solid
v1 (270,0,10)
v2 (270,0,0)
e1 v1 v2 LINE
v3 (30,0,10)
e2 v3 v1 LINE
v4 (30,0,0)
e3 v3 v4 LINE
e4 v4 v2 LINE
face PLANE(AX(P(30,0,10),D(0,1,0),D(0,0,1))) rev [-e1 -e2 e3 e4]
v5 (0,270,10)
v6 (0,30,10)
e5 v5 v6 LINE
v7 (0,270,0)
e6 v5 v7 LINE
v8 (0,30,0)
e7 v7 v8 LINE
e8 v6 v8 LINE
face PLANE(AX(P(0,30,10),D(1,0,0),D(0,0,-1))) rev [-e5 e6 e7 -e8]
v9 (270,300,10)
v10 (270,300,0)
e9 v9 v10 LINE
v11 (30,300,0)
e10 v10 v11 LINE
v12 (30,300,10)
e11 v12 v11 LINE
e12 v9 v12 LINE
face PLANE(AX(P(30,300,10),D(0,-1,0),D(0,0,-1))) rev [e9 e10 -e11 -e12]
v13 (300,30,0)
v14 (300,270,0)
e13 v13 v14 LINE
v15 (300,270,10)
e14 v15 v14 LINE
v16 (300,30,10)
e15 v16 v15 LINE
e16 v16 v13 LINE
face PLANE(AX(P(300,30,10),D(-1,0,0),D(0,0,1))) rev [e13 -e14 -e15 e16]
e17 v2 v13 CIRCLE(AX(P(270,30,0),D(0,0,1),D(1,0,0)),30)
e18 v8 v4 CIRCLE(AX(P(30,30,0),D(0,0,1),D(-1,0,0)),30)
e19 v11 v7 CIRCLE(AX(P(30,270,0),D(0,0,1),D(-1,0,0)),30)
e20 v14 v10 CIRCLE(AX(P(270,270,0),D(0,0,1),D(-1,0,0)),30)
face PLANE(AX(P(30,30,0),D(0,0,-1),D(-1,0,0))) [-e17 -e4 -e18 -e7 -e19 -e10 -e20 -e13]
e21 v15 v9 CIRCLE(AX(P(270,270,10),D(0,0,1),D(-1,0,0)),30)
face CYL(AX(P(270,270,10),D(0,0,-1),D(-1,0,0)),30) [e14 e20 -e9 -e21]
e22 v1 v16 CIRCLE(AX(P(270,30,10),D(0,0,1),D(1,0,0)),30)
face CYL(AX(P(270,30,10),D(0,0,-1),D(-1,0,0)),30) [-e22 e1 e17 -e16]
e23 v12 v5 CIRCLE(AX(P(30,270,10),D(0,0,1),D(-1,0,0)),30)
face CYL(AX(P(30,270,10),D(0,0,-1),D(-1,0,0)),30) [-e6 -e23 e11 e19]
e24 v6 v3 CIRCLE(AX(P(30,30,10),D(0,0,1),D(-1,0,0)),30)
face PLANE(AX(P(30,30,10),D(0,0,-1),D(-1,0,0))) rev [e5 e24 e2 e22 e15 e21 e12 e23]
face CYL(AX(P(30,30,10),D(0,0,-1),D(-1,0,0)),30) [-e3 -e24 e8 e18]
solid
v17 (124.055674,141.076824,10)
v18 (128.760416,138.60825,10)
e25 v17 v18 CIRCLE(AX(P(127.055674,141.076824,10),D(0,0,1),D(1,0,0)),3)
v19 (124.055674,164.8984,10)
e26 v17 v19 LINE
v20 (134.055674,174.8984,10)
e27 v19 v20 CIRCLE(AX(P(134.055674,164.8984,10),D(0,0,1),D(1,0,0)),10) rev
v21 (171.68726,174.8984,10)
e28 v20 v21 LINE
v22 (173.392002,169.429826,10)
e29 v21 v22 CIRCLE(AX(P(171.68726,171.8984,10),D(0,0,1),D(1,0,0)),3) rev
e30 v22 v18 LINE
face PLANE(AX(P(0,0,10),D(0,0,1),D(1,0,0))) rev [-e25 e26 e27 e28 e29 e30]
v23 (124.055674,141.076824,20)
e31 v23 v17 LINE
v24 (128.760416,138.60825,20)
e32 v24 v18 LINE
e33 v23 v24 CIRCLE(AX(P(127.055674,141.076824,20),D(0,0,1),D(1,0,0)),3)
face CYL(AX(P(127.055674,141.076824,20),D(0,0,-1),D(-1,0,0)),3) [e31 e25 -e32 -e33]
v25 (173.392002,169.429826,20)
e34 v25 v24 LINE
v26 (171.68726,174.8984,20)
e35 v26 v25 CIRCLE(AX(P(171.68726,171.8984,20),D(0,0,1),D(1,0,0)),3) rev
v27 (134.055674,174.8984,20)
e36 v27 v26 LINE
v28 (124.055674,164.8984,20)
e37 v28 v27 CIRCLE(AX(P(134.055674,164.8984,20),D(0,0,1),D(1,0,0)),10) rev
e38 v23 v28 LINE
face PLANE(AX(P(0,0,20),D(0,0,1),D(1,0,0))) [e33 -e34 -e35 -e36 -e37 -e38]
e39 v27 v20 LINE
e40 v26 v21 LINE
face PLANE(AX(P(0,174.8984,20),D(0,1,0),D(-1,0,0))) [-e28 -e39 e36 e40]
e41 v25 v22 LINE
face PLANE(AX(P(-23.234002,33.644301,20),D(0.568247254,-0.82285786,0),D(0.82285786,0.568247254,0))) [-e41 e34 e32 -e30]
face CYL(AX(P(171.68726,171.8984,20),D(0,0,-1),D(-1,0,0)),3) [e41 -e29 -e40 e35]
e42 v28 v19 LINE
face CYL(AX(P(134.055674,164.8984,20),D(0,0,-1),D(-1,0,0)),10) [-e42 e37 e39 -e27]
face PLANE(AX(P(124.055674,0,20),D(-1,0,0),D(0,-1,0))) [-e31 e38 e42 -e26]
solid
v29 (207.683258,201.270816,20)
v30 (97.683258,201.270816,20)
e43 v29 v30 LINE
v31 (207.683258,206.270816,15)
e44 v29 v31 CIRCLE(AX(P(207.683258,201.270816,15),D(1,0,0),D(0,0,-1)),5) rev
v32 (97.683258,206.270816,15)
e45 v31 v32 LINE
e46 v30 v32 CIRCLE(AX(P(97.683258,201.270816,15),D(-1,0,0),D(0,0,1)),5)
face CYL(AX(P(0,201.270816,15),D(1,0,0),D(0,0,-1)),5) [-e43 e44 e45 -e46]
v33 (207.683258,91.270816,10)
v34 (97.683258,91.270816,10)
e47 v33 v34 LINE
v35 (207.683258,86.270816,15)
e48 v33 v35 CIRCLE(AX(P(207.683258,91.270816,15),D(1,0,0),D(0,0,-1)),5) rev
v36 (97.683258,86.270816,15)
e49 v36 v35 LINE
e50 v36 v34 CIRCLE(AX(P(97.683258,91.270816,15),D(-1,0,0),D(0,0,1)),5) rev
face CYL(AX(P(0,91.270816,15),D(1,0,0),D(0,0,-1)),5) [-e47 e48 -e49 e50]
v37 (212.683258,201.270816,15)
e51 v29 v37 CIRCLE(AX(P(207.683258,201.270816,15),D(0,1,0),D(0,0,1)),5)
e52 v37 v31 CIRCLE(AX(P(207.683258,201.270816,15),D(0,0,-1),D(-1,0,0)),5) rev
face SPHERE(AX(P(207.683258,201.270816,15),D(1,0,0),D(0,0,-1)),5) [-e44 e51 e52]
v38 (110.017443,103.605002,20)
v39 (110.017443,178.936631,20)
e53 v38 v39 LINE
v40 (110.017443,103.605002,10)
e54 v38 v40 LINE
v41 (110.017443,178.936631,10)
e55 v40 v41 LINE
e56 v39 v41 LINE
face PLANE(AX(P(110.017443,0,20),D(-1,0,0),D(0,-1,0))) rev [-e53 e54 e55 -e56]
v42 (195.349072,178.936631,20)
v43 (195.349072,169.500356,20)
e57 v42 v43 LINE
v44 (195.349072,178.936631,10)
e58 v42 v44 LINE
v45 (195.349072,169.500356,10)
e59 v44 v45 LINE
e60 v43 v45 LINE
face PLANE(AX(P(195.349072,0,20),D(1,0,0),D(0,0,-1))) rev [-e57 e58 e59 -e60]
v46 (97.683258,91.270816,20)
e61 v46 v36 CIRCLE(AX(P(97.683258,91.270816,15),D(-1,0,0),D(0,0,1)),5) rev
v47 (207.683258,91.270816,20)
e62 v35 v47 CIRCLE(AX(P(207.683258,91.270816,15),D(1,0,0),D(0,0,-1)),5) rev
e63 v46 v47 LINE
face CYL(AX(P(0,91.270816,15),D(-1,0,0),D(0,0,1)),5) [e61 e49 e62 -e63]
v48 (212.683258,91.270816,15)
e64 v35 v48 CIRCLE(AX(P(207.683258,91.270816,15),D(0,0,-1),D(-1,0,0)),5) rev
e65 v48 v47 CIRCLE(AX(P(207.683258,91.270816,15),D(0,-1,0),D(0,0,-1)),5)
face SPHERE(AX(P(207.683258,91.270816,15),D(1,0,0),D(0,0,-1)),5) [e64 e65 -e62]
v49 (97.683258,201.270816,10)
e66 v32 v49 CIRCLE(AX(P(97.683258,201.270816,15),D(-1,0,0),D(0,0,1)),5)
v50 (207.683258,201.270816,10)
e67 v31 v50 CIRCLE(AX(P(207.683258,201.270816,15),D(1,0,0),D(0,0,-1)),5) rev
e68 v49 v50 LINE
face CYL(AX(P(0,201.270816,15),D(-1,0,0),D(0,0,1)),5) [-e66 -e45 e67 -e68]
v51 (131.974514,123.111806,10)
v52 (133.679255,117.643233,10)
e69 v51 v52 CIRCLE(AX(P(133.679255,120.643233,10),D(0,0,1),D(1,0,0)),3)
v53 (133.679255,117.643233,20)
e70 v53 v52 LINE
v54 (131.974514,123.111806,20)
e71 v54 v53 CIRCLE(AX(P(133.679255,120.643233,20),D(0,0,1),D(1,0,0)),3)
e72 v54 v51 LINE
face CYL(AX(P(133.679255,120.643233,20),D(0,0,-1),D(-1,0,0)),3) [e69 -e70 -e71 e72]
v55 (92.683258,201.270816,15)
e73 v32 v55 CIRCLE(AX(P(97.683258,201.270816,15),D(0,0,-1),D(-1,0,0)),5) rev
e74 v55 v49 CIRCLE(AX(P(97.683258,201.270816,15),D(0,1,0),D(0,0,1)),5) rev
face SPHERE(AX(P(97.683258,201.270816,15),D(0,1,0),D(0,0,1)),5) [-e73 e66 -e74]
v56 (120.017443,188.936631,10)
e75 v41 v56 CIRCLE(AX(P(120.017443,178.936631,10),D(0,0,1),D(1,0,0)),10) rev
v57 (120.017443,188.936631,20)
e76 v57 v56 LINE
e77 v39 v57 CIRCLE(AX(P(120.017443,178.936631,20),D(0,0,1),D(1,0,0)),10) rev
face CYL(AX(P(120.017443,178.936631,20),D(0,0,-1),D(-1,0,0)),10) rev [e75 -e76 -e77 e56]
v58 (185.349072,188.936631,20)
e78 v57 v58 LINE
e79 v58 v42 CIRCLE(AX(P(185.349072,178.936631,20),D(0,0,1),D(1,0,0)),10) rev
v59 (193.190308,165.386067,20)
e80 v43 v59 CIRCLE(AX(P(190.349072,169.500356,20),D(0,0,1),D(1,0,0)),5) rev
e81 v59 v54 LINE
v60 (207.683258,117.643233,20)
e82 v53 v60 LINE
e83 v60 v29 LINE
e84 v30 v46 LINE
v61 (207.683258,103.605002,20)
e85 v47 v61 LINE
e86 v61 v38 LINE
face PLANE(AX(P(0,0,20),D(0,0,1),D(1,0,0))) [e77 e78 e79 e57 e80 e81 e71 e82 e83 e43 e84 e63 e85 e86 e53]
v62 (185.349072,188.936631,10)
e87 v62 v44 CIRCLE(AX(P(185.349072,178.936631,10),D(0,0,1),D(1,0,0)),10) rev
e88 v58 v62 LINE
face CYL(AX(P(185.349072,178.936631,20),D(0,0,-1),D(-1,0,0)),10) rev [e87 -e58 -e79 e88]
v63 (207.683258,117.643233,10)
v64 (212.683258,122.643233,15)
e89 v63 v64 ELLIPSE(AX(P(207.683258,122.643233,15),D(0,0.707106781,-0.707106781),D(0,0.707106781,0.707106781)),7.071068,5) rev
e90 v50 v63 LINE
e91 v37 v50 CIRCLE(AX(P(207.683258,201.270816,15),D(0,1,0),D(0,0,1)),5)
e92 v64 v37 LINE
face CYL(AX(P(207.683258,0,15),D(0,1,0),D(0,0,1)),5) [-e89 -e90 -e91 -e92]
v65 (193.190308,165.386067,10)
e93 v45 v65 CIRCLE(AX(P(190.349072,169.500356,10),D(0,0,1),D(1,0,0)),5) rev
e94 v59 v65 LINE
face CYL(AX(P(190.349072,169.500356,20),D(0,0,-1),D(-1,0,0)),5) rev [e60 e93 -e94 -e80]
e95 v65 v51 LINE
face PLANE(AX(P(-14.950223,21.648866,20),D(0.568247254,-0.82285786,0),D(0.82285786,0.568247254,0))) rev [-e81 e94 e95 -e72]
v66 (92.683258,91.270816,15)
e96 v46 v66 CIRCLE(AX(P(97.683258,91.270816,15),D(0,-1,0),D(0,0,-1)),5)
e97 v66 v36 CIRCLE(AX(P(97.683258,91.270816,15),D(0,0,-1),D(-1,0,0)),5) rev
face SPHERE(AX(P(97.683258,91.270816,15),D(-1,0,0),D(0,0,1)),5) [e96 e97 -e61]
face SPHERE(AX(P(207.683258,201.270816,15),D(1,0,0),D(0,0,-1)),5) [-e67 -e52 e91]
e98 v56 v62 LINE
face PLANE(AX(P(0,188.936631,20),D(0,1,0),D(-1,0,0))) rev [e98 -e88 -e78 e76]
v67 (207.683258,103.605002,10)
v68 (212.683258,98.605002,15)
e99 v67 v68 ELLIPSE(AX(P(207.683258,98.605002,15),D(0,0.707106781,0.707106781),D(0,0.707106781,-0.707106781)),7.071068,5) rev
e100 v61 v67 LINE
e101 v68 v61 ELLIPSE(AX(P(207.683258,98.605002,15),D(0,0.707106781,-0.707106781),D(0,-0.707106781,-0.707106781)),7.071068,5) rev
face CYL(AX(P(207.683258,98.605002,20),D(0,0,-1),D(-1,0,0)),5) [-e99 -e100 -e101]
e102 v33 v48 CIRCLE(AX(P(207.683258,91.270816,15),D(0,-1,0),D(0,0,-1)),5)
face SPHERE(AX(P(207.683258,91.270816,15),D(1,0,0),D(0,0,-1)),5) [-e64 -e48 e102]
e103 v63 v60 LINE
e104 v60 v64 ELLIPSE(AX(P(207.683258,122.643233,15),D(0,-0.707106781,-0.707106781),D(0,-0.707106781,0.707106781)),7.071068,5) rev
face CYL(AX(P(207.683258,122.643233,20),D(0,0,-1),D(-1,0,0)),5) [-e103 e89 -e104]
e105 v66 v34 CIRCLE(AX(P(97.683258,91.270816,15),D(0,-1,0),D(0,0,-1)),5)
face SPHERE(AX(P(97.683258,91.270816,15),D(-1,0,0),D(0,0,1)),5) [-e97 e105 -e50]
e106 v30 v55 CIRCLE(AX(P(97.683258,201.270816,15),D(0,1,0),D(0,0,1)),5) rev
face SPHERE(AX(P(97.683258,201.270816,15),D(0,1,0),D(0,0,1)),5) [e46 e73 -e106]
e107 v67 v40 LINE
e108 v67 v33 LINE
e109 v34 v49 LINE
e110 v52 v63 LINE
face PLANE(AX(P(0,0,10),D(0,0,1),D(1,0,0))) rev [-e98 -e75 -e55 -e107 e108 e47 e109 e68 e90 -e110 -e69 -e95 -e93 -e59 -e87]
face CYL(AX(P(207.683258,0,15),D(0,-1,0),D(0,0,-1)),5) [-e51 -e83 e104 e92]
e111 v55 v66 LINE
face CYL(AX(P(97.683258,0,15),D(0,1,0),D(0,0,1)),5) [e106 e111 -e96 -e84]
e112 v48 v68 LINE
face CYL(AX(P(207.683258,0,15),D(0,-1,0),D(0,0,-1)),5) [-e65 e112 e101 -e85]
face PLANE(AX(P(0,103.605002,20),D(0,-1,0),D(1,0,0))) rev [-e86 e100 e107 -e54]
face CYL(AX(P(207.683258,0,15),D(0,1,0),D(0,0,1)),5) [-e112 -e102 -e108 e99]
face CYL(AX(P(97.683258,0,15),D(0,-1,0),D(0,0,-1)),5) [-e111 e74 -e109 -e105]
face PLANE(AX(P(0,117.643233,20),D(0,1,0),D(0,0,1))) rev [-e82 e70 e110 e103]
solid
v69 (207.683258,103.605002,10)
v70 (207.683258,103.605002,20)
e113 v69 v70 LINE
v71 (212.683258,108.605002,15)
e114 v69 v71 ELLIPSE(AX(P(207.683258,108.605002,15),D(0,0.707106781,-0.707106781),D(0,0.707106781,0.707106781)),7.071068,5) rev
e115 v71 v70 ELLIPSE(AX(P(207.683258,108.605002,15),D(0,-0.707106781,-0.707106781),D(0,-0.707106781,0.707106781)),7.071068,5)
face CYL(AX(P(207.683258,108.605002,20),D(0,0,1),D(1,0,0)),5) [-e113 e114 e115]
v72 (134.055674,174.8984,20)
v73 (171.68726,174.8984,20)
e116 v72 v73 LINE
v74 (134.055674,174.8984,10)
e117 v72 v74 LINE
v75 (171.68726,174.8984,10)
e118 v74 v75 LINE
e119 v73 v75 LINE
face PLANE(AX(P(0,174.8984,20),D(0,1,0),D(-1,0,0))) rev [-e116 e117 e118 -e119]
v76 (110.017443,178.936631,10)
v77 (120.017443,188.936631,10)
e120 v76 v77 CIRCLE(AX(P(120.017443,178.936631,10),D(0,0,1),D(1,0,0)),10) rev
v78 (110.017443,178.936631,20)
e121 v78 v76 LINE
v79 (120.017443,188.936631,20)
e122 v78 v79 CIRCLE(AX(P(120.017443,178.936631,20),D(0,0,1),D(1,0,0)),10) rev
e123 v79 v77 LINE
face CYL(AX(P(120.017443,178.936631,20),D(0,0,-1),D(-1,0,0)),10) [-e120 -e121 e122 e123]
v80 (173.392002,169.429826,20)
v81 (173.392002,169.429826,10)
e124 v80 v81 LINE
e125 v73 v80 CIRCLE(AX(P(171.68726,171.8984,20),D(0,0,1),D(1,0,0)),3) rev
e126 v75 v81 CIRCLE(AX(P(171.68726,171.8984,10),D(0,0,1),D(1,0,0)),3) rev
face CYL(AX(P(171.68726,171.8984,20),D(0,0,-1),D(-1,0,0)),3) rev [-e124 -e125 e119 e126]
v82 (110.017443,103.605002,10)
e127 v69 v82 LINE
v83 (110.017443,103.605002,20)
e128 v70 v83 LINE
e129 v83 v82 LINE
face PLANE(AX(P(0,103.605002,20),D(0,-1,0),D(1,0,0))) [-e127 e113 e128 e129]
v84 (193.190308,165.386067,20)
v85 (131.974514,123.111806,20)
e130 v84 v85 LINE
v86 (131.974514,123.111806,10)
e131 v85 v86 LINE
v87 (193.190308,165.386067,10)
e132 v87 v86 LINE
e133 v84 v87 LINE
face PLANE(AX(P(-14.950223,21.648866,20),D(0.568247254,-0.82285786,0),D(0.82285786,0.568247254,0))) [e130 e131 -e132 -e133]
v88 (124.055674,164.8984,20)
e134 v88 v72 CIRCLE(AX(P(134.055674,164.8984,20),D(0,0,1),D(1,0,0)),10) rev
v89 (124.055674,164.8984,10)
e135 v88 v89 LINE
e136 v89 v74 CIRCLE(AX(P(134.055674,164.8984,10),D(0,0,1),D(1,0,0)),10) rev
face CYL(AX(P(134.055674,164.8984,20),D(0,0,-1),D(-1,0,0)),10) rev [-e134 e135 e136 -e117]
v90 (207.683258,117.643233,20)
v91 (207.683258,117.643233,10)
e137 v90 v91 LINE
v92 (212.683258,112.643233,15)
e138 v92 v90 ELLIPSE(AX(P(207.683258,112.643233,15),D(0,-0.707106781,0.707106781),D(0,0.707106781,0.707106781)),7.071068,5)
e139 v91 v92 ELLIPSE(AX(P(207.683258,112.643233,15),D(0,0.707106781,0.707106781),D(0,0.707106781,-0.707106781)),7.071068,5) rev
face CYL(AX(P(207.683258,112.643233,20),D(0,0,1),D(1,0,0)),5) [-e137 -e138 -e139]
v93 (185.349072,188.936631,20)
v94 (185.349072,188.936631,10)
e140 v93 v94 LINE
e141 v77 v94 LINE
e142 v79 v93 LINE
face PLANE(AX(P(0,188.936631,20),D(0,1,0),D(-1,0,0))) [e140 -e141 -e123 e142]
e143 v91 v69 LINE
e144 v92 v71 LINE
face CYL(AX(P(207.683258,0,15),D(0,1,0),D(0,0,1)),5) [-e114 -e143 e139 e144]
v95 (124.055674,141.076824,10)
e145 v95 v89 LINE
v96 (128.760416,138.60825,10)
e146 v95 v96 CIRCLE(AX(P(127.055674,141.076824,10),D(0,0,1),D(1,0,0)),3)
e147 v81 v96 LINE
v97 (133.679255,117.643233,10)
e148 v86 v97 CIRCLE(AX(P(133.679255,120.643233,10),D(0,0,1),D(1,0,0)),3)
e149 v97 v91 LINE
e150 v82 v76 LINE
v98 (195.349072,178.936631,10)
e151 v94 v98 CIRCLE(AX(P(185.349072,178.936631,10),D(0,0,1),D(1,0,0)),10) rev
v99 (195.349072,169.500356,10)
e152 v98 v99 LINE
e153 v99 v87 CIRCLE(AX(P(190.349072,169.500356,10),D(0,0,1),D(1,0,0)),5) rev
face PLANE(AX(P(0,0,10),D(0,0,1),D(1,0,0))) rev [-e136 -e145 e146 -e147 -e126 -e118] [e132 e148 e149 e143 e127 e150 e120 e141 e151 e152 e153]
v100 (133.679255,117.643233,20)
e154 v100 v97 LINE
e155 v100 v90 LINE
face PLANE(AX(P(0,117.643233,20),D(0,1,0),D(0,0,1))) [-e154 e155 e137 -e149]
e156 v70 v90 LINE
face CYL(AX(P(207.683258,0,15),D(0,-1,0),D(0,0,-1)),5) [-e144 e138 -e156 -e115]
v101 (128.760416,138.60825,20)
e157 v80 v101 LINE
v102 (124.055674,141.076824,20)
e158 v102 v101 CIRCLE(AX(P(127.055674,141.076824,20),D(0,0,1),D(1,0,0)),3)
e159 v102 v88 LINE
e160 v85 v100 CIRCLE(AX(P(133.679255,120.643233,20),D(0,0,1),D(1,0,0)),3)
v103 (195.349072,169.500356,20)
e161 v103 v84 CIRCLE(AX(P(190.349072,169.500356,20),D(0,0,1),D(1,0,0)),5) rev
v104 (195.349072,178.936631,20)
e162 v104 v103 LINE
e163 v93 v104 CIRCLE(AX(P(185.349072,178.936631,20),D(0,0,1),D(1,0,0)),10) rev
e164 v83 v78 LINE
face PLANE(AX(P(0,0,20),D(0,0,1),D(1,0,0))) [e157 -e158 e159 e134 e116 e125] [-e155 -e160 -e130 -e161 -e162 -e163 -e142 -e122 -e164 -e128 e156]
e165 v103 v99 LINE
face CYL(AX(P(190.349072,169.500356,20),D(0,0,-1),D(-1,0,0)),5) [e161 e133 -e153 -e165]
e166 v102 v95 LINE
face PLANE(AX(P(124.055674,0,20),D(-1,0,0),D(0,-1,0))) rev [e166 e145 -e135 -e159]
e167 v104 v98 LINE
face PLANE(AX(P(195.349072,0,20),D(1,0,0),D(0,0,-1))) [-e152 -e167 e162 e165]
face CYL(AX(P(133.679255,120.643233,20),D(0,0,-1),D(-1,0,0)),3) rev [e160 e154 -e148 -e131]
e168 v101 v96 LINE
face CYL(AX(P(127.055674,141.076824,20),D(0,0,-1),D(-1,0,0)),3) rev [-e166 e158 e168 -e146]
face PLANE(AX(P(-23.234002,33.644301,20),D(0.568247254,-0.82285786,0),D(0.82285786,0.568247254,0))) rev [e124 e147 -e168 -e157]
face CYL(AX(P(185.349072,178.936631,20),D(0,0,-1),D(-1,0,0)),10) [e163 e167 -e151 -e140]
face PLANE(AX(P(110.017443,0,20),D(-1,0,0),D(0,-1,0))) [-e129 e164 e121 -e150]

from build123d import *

# Parameters (mm, degrees)
BOSS_EXTRUDE1_DEPTH   = 10
BOSS_EXTRUDE2_DEPTH   = 10
BOSS_EXTRUDE2_2_DEPTH = 10
BOSS_EXTRUDE3_DEPTH   = 10
FILLET1_R             = 5
FILLET2_R             = 5


with BuildPart() as part:
    # Sketch1 → Boss-Extrude1 (new body)
    with BuildSketch(Plane.XY):
        with BuildLine():
            Line((30, 0), (270, 0))
            ThreePointArc((270, 0), (291.213203436, 8.786796564), (300, 30))
            Line((300, 30), (300, 270))
            ThreePointArc((300, 270), (291.213203436, 291.213203436), (270, 300))
            Line((270, 300), (30, 300))
            ThreePointArc((30, 300), (8.786796564, 291.213203436), (0, 270))
            Line((0, 270), (0, 30))
            ThreePointArc((0, 30), (8.786796564, 8.786796564), (30, 0))
        make_face()
    extrude(amount=BOSS_EXTRUDE1_DEPTH)


with BuildPart() as body_2:
    # Sketch2 → Boss-Extrude2 (new body)
    with BuildSketch(Plane.XY.offset(10)):
        with BuildLine():
            Line((212.683257667, 86.270816378), (212.683257667, 103.605002094))
            Line((212.683257667, 103.605002094), (110.017443383, 103.605002094))
            Line((110.017443383, 103.605002094), (110.017443383, 178.936630662))
            ThreePointArc((110.017443383, 178.936630662), (112.946375571, 186.007698474), (120.017443383, 188.936630662))
            Line((120.017443383, 188.936630662), (185.349071951, 188.936630662))
            ThreePointArc((185.349071951, 188.936630662), (192.420139763, 186.007698474), (195.349071951, 178.936630662))
            Line((195.349071951, 178.936630662), (195.349071951, 169.500355881))
            ThreePointArc((195.349071951, 169.500355881), (194.776609718, 167.177230977), (193.190308222, 165.38606658))
            Line((193.190308222, 165.38606658), (131.974513591, 123.111806467))
            ThreePointArc((131.974513591, 123.111806467), (130.815191742, 119.750406123), (133.679255354, 117.643232887))
            Line((133.679255354, 117.643232887), (212.683257667, 117.643232887))
            Line((212.683257667, 117.643232887), (212.683257667, 206.270816378))
            Line((212.683257667, 206.270816378), (92.683257667, 206.270816378))
            Line((92.683257667, 206.270816378), (92.683257667, 86.270816378))
            Line((92.683257667, 86.270816378), (212.683257667, 86.270816378))
        make_face()
    extrude(amount=BOSS_EXTRUDE2_DEPTH)

    # Fillet1
    fillet1_edges = [body_2.edges().sort_by_distance(p)[0] for p in [
        (212.683257667, 94.937909236, 10),
        (152.683257667, 86.270816378, 10),
        (92.683257667, 146.270816378, 10),
        (152.683257667, 206.270816378, 10),
        (212.683257667, 161.957024632, 10),
        (212.683257667, 103.605002094, 15),
        (212.683257667, 86.270816378, 15),
        (92.683257667, 86.270816378, 15),
        (92.683257667, 206.270816378, 15),
        (212.683257667, 206.270816378, 15),
        (212.683257667, 117.643232887, 15),
        (212.683257667, 161.957024632, 20),
        (152.683257667, 206.270816378, 20),
        (92.683257667, 146.270816378, 20),
        (152.683257667, 86.270816378, 20),
        (212.683257667, 94.937909236, 20),
    ]]
    fillet(fillet1_edges, radius=FILLET1_R - 0.0001)  # a hair under: the kernel refuses the full size


with BuildPart() as body_3:
    # Sketch2 → Boss-Extrude2 2 (new body)
    with BuildSketch(Plane.XY.offset(10)):
        with BuildLine():
            Line((124.055674176, 164.898399869), (124.055674176, 141.076823854))
            ThreePointArc((124.055674176, 141.076823854), (125.661799233, 138.420301194), (128.760415939, 138.608250273))
            Line((128.760415939, 138.608250273), (173.392001743, 169.429826289))
            ThreePointArc((173.392001743, 169.429826289), (174.551323592, 172.791226633), (171.687259981, 174.898399869))
            Line((171.687259981, 174.898399869), (134.055674176, 174.898399869))
            ThreePointArc((134.055674176, 174.898399869), (126.984606364, 171.969467681), (124.055674176, 164.898399869))
        make_face()
    extrude(amount=BOSS_EXTRUDE2_2_DEPTH)


with BuildPart() as body_4:
    # Sketch2<3> → Boss-Extrude3 (new body)
    with BuildSketch(Plane.XY.offset(10)):
        with BuildLine():
            Line((110.017443383, 103.605002094), (212.683257667, 103.605002094))
            Line((212.683257667, 103.605002094), (212.683257667, 117.643232887))
            Line((212.683257667, 117.643232887), (133.679255354, 117.643232887))
            ThreePointArc((133.679255354, 117.643232887), (130.815191742, 119.750406123), (131.974513591, 123.111806467))
            Line((131.974513591, 123.111806467), (193.190308222, 165.38606658))
            ThreePointArc((193.190308222, 165.38606658), (194.776609718, 167.177230977), (195.349071951, 169.500355881))
            Line((195.349071951, 169.500355881), (195.349071951, 178.936630662))
            ThreePointArc((195.349071951, 178.936630662), (192.420139763, 186.007698474), (185.349071951, 188.936630662))
            Line((185.349071951, 188.936630662), (120.017443383, 188.936630662))
            ThreePointArc((120.017443383, 188.936630662), (112.946375571, 186.007698474), (110.017443383, 178.936630662))
            Line((110.017443383, 178.936630662), (110.017443383, 103.605002094))
        make_face()
        with BuildLine():
            ThreePointArc((128.760415939, 138.608250273), (125.661799233, 138.420301194), (124.055674176, 141.076823854))
            Line((124.055674176, 141.076823854), (124.055674176, 164.898399869))
            ThreePointArc((124.055674176, 164.898399869), (126.984606364, 171.969467681), (134.055674176, 174.898399869))
            Line((134.055674176, 174.898399869), (171.687259981, 174.898399869))
            ThreePointArc((171.687259981, 174.898399869), (174.551323592, 172.791226633), (173.392001743, 169.429826289))
            Line((173.392001743, 169.429826289), (128.760415939, 138.608250273))
        make_face(mode=Mode.SUBTRACT)
    extrude(amount=BOSS_EXTRUDE3_DEPTH)

    # Fillet2
    fillet2_edges = [body_4.edges().sort_by_distance(p)[0] for p in [
        (212.683257667, 110.62411749, 10),
        (212.683257667, 117.643232887, 15),
        (212.683257667, 103.605002094, 15),
        (212.683257667, 110.62411749, 20),
    ]]
    fillet(fillet2_edges, radius=FILLET2_R - 0.0001)  # a hair under: the kernel refuses the full size


solid = Compound([part.part, body_2.part, body_3.part, body_4.part])
